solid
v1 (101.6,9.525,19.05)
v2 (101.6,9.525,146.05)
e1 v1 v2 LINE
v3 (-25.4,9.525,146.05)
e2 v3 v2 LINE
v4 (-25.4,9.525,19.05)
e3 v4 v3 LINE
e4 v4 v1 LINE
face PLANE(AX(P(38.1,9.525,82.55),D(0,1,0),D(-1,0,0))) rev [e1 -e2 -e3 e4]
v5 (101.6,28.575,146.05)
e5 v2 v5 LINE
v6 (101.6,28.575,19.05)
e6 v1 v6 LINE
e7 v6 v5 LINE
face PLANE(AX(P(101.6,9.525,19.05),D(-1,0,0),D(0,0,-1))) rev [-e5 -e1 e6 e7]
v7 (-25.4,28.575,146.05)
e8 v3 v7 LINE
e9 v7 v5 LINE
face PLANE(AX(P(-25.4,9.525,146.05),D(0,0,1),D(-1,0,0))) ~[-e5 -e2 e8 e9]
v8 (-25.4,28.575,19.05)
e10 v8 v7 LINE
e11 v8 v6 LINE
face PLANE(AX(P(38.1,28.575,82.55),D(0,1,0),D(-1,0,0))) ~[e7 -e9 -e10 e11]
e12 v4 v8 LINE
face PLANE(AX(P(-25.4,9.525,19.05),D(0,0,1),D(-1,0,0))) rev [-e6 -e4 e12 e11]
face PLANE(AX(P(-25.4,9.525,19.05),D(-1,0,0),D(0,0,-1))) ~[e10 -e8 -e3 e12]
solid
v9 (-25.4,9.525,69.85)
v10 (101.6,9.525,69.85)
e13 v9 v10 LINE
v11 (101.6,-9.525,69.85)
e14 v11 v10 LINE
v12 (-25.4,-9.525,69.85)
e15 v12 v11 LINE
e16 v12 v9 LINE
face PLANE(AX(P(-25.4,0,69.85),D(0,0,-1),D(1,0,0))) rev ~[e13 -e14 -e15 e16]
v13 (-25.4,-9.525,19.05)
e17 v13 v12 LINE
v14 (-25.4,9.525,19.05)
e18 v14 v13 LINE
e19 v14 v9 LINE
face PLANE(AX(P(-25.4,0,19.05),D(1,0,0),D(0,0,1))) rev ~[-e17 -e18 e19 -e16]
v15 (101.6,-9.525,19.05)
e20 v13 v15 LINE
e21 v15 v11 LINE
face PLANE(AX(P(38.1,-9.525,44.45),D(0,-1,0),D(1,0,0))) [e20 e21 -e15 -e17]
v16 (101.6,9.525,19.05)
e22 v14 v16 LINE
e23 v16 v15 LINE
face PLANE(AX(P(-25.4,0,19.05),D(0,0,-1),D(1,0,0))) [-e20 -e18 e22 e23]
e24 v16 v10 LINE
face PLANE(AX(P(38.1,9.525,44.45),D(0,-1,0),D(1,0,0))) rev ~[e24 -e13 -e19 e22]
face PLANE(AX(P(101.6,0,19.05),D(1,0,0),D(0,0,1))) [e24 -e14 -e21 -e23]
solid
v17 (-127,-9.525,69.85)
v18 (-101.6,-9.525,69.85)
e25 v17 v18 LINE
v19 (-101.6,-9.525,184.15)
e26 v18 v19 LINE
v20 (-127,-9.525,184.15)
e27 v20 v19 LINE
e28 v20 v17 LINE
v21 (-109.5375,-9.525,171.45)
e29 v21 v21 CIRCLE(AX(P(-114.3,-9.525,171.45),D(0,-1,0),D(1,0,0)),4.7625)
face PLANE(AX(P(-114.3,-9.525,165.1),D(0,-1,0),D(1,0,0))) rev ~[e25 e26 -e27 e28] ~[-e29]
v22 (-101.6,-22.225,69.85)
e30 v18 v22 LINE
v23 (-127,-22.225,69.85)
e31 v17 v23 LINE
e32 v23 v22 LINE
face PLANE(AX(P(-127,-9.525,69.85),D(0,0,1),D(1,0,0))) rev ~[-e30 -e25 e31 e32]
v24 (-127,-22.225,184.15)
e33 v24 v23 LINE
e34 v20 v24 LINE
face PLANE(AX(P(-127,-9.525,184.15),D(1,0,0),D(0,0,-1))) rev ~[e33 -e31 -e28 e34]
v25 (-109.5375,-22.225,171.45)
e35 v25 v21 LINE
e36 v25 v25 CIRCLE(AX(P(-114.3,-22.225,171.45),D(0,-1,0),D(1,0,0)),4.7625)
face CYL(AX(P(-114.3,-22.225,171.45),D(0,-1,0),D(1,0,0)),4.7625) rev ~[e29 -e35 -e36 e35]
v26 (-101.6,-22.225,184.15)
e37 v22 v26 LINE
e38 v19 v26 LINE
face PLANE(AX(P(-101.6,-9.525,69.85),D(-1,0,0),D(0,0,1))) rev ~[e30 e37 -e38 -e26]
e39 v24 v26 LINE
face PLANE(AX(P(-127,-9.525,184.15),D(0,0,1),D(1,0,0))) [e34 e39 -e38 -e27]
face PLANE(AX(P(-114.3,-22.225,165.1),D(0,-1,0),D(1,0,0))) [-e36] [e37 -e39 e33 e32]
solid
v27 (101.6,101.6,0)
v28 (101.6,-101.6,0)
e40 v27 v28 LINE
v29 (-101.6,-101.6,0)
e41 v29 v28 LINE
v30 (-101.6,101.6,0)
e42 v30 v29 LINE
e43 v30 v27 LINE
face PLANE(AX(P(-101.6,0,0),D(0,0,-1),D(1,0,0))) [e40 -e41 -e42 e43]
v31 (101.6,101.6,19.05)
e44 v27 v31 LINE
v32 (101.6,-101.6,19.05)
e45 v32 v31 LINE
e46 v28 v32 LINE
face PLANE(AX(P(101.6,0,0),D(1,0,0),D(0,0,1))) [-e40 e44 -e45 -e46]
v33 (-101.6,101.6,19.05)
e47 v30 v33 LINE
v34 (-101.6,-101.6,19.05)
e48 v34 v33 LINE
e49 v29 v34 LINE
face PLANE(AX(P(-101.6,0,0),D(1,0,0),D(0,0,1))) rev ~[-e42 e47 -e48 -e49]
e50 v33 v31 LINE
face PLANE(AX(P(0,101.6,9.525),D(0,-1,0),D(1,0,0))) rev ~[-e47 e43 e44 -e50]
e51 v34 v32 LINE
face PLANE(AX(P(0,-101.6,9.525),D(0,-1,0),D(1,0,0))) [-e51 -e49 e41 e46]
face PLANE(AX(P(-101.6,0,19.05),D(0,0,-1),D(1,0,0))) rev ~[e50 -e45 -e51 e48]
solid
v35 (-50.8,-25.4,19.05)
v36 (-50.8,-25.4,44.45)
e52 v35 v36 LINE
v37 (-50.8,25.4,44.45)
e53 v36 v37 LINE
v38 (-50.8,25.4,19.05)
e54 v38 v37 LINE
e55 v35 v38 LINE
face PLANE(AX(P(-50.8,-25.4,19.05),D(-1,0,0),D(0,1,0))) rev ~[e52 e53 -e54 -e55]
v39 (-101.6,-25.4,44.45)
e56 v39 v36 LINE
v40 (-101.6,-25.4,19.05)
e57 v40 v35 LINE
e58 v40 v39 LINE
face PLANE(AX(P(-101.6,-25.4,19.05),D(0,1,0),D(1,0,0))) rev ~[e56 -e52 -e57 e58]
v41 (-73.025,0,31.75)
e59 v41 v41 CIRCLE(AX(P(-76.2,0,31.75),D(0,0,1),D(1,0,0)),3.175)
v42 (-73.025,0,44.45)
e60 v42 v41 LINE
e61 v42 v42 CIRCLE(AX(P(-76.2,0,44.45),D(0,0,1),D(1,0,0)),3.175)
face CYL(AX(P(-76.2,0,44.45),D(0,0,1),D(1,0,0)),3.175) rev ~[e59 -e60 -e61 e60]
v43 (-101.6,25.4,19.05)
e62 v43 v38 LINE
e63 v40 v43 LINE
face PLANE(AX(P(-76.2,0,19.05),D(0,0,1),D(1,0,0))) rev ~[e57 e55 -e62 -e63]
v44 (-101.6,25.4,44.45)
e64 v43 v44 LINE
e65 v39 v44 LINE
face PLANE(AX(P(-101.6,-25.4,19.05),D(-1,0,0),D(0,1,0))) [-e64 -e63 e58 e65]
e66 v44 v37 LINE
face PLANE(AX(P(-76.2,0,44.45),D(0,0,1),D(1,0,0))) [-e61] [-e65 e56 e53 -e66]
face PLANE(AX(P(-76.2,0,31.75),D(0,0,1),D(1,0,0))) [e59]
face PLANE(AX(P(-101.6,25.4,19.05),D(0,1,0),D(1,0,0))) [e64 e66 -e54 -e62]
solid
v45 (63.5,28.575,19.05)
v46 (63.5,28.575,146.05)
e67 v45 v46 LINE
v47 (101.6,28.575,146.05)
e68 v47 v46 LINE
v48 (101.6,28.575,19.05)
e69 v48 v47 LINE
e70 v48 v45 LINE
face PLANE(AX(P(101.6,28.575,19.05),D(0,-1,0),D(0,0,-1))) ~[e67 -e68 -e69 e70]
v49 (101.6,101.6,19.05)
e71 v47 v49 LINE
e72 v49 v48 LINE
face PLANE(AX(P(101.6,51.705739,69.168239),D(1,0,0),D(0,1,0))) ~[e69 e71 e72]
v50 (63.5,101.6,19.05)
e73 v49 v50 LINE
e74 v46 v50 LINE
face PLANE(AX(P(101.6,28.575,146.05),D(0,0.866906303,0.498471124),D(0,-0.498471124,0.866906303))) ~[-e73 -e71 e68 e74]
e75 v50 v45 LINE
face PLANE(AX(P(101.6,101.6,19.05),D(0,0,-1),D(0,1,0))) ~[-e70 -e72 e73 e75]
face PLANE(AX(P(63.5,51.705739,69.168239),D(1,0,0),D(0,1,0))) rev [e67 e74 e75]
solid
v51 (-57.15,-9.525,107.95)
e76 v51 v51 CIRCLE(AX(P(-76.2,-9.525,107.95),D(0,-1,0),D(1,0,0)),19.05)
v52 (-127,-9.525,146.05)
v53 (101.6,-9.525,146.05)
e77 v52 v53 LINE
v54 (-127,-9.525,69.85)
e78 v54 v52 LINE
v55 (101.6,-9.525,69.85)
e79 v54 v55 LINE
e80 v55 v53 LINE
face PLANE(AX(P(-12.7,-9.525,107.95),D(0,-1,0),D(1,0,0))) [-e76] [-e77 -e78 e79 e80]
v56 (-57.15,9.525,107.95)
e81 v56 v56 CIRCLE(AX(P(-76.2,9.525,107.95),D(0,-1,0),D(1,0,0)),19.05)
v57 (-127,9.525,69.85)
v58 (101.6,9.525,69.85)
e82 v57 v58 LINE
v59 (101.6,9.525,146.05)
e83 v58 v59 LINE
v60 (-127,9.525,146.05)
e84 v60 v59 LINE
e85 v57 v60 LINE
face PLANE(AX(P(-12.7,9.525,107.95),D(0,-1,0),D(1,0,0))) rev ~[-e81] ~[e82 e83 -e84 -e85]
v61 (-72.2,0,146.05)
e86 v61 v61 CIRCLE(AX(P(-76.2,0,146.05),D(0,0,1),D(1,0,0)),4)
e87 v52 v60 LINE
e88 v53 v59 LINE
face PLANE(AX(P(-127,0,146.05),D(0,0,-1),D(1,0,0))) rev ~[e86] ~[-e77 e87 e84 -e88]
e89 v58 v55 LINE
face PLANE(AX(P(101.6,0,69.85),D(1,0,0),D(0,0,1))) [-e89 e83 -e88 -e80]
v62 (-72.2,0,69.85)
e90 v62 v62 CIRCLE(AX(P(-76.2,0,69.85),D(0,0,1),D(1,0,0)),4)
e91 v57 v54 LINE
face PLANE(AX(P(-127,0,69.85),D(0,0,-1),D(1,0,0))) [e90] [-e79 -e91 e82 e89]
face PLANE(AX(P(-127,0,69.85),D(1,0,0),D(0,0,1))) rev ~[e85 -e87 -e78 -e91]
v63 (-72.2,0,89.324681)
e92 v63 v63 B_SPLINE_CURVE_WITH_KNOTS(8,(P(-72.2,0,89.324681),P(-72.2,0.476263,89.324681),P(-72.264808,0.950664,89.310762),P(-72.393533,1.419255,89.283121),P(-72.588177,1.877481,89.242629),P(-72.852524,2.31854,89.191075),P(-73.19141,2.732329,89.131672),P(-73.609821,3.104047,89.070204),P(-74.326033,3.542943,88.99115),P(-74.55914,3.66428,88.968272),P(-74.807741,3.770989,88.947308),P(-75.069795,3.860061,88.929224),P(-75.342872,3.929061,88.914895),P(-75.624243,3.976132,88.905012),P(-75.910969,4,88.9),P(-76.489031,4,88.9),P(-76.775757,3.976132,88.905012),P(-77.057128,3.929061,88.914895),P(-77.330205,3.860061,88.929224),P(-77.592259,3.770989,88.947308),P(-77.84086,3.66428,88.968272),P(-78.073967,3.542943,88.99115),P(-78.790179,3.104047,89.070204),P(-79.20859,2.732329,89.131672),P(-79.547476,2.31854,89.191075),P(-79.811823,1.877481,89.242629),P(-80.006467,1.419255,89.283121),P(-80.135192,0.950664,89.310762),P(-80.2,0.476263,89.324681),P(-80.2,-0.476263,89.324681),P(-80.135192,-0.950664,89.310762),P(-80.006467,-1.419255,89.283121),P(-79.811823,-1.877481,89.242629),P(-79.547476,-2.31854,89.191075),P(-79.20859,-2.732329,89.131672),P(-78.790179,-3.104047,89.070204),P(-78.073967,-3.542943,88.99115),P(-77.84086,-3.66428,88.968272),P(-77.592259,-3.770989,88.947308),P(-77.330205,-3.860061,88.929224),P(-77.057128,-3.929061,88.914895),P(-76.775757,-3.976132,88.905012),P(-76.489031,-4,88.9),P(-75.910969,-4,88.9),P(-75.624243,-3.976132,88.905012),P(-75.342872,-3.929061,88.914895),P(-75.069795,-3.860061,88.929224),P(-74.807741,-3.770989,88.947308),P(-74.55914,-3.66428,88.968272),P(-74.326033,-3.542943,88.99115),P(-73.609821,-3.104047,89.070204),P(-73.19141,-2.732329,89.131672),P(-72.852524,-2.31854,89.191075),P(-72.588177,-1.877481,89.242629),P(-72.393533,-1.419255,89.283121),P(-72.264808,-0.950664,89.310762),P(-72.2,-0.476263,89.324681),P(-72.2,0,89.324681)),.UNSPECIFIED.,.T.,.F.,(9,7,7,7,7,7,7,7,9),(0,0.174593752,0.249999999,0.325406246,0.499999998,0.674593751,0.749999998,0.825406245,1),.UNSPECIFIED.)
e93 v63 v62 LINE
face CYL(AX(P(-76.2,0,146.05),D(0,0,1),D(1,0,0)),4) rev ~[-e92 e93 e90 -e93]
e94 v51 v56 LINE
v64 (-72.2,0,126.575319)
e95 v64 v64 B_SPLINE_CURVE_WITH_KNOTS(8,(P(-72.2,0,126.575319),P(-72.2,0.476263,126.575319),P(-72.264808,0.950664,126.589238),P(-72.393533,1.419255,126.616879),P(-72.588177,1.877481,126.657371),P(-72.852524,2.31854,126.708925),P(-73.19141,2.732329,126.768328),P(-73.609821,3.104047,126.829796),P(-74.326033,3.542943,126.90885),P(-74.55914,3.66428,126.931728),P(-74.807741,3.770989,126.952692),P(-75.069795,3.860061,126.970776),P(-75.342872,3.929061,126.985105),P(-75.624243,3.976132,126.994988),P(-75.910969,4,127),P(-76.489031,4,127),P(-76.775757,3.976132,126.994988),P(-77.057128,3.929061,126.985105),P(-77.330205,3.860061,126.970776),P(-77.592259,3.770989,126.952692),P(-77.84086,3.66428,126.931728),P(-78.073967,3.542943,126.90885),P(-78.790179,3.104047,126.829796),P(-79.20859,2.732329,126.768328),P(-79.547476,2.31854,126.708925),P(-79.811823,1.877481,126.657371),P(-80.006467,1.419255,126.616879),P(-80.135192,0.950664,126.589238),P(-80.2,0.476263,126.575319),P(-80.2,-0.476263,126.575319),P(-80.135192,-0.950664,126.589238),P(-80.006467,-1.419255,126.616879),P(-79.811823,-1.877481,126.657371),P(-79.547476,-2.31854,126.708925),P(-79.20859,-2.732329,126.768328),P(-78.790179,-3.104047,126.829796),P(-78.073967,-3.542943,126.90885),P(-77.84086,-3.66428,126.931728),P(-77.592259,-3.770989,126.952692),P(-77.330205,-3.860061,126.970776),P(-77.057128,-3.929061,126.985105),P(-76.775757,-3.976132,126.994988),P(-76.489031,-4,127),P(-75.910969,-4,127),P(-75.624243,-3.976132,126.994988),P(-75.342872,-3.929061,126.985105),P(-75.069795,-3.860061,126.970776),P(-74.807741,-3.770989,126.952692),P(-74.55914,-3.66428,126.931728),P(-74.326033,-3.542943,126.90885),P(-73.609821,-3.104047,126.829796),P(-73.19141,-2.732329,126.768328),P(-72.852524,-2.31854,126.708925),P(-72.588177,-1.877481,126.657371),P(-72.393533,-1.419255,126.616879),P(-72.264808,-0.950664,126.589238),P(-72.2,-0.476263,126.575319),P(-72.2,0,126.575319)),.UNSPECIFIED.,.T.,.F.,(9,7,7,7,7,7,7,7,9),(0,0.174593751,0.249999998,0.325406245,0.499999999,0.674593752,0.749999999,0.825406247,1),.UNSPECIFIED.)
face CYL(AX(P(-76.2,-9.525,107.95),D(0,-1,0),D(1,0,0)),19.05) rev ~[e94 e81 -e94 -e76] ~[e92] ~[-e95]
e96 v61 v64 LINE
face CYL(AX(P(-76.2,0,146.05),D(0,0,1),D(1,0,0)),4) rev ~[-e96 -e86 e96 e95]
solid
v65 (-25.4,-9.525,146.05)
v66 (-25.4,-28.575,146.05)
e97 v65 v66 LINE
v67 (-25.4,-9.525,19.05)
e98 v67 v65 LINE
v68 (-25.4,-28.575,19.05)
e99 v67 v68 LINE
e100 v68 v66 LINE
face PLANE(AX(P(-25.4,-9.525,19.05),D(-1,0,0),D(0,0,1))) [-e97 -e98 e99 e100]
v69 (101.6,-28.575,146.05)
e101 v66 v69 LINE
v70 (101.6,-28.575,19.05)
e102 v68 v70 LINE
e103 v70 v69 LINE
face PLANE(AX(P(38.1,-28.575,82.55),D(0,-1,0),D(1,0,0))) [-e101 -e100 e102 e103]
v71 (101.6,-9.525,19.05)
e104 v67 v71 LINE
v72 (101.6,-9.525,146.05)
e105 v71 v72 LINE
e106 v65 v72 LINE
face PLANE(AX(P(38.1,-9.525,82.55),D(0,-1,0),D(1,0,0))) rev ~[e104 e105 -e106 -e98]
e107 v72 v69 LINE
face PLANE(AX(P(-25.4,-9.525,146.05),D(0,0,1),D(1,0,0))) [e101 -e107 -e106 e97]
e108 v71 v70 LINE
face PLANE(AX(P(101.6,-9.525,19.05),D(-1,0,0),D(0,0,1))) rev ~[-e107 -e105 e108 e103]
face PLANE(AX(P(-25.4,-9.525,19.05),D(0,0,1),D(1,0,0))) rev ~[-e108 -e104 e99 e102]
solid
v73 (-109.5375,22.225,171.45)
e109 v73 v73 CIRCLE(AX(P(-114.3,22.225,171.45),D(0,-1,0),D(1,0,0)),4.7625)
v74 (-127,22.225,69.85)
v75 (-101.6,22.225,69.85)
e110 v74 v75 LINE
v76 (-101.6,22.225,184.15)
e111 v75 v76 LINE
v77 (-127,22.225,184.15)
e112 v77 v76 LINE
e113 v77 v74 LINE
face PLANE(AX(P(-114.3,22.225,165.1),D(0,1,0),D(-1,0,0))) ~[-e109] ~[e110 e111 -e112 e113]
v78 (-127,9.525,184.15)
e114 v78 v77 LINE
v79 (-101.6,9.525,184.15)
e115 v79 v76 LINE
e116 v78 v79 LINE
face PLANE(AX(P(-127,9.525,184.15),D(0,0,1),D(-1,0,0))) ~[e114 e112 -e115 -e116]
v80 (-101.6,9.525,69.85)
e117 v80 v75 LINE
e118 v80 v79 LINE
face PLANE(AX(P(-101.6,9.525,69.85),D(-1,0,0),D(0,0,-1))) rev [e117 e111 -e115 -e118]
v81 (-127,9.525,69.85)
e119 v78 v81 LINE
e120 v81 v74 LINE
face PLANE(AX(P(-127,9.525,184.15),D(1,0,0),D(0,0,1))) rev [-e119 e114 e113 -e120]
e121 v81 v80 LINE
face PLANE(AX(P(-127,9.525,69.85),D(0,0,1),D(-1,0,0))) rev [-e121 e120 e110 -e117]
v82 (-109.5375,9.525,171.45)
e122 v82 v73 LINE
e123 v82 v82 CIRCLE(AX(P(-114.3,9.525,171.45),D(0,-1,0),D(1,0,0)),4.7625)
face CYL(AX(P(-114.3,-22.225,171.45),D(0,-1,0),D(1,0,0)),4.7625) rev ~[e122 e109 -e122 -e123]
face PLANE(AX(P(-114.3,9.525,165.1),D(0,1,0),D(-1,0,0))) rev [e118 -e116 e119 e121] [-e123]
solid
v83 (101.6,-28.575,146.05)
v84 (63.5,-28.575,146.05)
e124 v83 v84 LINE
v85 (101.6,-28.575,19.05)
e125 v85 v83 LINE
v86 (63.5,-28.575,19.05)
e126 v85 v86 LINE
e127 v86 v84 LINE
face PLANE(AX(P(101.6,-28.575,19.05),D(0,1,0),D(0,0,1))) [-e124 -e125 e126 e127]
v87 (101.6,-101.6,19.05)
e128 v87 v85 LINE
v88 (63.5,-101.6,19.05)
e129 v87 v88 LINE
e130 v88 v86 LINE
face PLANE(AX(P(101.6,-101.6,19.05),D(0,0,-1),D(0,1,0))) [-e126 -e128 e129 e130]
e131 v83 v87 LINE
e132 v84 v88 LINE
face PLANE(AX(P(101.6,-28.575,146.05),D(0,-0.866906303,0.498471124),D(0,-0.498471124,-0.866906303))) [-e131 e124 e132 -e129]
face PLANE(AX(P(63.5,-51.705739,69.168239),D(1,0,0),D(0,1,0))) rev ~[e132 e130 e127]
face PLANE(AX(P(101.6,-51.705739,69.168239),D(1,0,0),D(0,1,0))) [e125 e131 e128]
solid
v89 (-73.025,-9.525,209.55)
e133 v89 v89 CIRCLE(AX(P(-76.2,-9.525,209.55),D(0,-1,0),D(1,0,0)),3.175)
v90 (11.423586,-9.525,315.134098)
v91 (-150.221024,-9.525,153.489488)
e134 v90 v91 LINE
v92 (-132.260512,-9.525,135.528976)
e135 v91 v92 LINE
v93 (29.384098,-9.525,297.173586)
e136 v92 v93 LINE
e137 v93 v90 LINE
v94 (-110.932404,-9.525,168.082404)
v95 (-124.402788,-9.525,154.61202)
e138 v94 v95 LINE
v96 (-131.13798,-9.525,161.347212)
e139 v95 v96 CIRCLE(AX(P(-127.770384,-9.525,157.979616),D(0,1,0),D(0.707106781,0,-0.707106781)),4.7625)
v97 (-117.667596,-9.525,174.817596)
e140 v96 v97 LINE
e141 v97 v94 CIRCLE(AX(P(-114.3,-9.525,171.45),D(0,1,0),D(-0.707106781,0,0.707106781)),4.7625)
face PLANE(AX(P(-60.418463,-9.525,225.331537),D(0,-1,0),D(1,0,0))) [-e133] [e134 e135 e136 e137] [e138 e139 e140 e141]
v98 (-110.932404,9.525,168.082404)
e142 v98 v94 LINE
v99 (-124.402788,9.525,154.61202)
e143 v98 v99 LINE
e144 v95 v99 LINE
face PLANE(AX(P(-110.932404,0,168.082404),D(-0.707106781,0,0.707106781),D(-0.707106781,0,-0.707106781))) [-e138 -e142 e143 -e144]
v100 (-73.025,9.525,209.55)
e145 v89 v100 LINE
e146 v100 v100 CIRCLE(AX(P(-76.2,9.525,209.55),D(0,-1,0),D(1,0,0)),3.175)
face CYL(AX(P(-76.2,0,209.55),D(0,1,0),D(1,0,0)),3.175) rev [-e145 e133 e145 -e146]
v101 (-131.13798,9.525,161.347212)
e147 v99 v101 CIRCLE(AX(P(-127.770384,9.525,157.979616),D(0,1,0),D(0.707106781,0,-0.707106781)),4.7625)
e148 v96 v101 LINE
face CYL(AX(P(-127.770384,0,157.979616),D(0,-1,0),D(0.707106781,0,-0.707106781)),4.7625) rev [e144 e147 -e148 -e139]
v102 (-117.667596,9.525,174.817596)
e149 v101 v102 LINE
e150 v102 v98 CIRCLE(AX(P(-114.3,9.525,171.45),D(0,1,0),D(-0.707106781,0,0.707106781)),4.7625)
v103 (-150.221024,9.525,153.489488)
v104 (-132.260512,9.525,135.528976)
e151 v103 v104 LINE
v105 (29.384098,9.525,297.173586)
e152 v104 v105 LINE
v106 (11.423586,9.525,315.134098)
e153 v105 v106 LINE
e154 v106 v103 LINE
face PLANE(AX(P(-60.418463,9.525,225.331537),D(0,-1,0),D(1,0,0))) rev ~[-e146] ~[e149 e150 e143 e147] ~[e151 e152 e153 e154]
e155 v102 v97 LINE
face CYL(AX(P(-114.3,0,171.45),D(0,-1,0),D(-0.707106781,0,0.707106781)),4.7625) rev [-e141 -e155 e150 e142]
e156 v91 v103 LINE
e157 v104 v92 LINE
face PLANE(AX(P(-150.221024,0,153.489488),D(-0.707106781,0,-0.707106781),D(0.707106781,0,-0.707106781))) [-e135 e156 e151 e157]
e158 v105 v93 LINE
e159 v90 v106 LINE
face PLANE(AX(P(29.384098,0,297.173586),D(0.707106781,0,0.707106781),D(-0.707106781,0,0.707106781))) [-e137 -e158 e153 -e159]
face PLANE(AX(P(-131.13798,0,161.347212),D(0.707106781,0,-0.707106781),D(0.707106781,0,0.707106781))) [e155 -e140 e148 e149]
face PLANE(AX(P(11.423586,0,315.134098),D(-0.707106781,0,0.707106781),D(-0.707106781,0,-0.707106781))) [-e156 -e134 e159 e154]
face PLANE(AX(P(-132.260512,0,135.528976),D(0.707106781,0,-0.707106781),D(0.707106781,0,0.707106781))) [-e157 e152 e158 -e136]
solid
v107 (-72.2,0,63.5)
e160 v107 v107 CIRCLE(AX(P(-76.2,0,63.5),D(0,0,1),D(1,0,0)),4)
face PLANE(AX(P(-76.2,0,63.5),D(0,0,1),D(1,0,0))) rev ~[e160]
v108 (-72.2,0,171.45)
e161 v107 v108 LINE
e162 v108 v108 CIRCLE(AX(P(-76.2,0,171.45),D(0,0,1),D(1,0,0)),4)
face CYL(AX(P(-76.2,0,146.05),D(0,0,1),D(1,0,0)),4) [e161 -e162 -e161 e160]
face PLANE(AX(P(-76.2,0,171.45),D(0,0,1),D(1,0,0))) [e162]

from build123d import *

# Parameters (mm, degrees)
F0_W           = 203.2
F0_H           = 19.05
F1_DEPTH       = 101.6
F2_W           = 127
F2_H           = 50.8
F3_DEPTH       = 9.525
F4_W           = 228.6
F4_H           = 76.2
F5_DEPTH       = 9.525
F6_W           = 127
F6_H           = 127
F7_DEPTH       = 19.05
F10_DEPTH      = 38.1
F12_W          = 50.8
F12_H          = 50.8
F13_DEPTH      = 25.4
F14_R          = 3.175
F15_DEPTH      = 12.7
F16_R          = 4
F17_DEPTH      = 76.2
F18_R          = 19.05
F19_DEPTH      = 111.126
F20_W          = 25.4
F20_H          = 38.1
F20_H_2        = 76.2
F21_DEPTH      = 12.7
F23_R          = 4.7625
F24_DEPTH      = 123.826
F25_R          = 3.175
F26_DEPTH      = 9.525
F27_R          = 4
F28_DEPTH      = 25.4
F28_DEPTH_BACK = 82.55


# Not quite as in the source:
# - a feature names something its author has since deleted; it is built from what else it names


with BuildPart() as f1:
    # F0 (on Front) → F1 (new body, symmetric)
    with BuildSketch(Plane.XZ):
        with Locations((0, 9.525)):
            Rectangle(F0_W, F0_H)
    extrude(amount=F1_DEPTH, both=True)


with BuildPart() as f3:
    # F2 (on Front) → F3 (new body, symmetric)
    with BuildSketch(Plane.XZ):
        with Locations((38.1, 44.45)):
            Rectangle(F2_W, F2_H)
    extrude(amount=F3_DEPTH, both=True)


with BuildPart() as f5:
    # F4 (on Front) → F5 (new body, symmetric)
    with BuildSketch(Plane.XZ):
        with Locations((-12.7, 107.95)):
            Rectangle(F4_W, F4_H)
    extrude(amount=F5_DEPTH, both=True)

    # F16 (on face) → F17 (cut, through all)
    with BuildSketch(Plane.XY.offset(146.05)):
        with Locations((-76.2, 0)):
            Circle(F16_R)
    extrude(amount=-F17_DEPTH, mode=Mode.SUBTRACT)

    # F18 (on face) → F19 (cut, through all)
    with BuildSketch(Plane.XZ.offset(9.525)):
        with Locations((-76.2, 107.95)):
            Circle(F18_R)
    extrude(amount=-F19_DEPTH, mode=Mode.SUBTRACT)


with BuildPart() as f7:
    # F6 (on face) → F7 (new body)
    with BuildSketch(Plane.XZ.offset(9.525)):
        with Locations((38.1, 82.55)):
            Rectangle(F6_W, F6_H)
    extrude(amount=F7_DEPTH)


with BuildPart() as f8_1:
    # F8: instance of F7
    add(f7.part.mirror(Plane.XZ))


with BuildPart() as f10:
    # F9 (on face) → F10 (new body)
    with BuildSketch(Plane.YZ.offset(101.6)):
        Polygon((-28.575, 19.05), (-28.575, 146.05), (-101.6, 19.05), align=None)
    extrude(amount=-F10_DEPTH)


with BuildPart() as f11_1:
    # F11: instance of F10
    add(f10.part.mirror(Plane.XZ))


with BuildPart() as f13:
    # F12 (on face) → F13 (new body)
    with BuildSketch(Plane.XY.offset(19.05)):
        with Locations((-76.2, 0)):
            Rectangle(F12_W, F12_H)
    extrude(amount=F13_DEPTH)

    # F14 (on face) → F15 (cut)
    with BuildSketch(Plane.XY.offset(44.45)):
        with Locations((-76.2, 0)):
            Circle(F14_R)
    extrude(amount=-F15_DEPTH, mode=Mode.SUBTRACT)


with BuildPart() as f21:
    # F20 (on face) → F21 (new body)
    with BuildSketch(Plane.XZ.offset(9.525)):
        with Locations((-114.3, 165.1)):
            Rectangle(F20_W, F20_H)
        with Locations((-114.3, 107.95)):
            Rectangle(F20_W, F20_H_2)
    extrude(amount=F21_DEPTH)


with BuildPart() as f22_1:
    # F22: instance of F21
    add(f21.part.mirror(Plane.XZ))


with BuildPart() as f24_tool:
    # F23 (on face) → F24 (new body, through all)
    with BuildSketch(Plane.XZ.offset(22.225)):
        with Locations((-114.3, 171.45)):
            Circle(F23_R)
    extrude(amount=-F24_DEPTH)


with BuildPart() as f21_1:
    add(f21.part)

    # F24: cut by f24_tool
    add(f24_tool.part, mode=Mode.SUBTRACT)


with BuildPart() as f22_1_1:
    add(f22_1.part)

    # F24: cut by f24_tool
    add(f24_tool.part, mode=Mode.SUBTRACT)


with BuildPart() as f26:
    # F25 (on Front) → F26 (new body, symmetric)
    with BuildSketch(Plane.XZ):
        Polygon((-150.2210244843, 153.4894877579), (-132.2605122421, 135.5289755157), (29.3840979371, 297.173585695), (11.423585695, 315.1340979371), align=None)
        with BuildLine():
            ThreePointArc((-117.6675960454, 174.8175960454), (-110.9324039546, 174.8175960454), (-110.9324039546, 168.0824039546))
            Line((-110.9324039546, 168.0824039546), (-124.4027881362, 154.612019773))
            ThreePointArc((-124.4027881362, 154.612019773), (-131.137980227, 154.612019773), (-131.137980227, 161.3472118638))
            Line((-131.137980227, 161.3472118638), (-117.6675960454, 174.8175960454))
        make_face(mode=Mode.SUBTRACT)
        with Locations((-76.2, 209.55)):
            Circle(F25_R, mode=Mode.SUBTRACT)
    extrude(amount=F26_DEPTH, both=True)


with BuildPart() as f28:
    # F27 (on face) → F28 (new body, two sides)
    with BuildSketch(Plane.XY.offset(146.05)) as f28_sk:
        with Locations((-76.2, 0)):
            Circle(F27_R)
    extrude(amount=F28_DEPTH)
    extrude(f28_sk.sketch, amount=-F28_DEPTH_BACK)


solid = Compound([f1.part, f3.part, f5.part, f7.part, f8_1.part, f10.part, f11_1.part, f13.part, f21_1.part, f22_1_1.part, f26.part, f28.part])
